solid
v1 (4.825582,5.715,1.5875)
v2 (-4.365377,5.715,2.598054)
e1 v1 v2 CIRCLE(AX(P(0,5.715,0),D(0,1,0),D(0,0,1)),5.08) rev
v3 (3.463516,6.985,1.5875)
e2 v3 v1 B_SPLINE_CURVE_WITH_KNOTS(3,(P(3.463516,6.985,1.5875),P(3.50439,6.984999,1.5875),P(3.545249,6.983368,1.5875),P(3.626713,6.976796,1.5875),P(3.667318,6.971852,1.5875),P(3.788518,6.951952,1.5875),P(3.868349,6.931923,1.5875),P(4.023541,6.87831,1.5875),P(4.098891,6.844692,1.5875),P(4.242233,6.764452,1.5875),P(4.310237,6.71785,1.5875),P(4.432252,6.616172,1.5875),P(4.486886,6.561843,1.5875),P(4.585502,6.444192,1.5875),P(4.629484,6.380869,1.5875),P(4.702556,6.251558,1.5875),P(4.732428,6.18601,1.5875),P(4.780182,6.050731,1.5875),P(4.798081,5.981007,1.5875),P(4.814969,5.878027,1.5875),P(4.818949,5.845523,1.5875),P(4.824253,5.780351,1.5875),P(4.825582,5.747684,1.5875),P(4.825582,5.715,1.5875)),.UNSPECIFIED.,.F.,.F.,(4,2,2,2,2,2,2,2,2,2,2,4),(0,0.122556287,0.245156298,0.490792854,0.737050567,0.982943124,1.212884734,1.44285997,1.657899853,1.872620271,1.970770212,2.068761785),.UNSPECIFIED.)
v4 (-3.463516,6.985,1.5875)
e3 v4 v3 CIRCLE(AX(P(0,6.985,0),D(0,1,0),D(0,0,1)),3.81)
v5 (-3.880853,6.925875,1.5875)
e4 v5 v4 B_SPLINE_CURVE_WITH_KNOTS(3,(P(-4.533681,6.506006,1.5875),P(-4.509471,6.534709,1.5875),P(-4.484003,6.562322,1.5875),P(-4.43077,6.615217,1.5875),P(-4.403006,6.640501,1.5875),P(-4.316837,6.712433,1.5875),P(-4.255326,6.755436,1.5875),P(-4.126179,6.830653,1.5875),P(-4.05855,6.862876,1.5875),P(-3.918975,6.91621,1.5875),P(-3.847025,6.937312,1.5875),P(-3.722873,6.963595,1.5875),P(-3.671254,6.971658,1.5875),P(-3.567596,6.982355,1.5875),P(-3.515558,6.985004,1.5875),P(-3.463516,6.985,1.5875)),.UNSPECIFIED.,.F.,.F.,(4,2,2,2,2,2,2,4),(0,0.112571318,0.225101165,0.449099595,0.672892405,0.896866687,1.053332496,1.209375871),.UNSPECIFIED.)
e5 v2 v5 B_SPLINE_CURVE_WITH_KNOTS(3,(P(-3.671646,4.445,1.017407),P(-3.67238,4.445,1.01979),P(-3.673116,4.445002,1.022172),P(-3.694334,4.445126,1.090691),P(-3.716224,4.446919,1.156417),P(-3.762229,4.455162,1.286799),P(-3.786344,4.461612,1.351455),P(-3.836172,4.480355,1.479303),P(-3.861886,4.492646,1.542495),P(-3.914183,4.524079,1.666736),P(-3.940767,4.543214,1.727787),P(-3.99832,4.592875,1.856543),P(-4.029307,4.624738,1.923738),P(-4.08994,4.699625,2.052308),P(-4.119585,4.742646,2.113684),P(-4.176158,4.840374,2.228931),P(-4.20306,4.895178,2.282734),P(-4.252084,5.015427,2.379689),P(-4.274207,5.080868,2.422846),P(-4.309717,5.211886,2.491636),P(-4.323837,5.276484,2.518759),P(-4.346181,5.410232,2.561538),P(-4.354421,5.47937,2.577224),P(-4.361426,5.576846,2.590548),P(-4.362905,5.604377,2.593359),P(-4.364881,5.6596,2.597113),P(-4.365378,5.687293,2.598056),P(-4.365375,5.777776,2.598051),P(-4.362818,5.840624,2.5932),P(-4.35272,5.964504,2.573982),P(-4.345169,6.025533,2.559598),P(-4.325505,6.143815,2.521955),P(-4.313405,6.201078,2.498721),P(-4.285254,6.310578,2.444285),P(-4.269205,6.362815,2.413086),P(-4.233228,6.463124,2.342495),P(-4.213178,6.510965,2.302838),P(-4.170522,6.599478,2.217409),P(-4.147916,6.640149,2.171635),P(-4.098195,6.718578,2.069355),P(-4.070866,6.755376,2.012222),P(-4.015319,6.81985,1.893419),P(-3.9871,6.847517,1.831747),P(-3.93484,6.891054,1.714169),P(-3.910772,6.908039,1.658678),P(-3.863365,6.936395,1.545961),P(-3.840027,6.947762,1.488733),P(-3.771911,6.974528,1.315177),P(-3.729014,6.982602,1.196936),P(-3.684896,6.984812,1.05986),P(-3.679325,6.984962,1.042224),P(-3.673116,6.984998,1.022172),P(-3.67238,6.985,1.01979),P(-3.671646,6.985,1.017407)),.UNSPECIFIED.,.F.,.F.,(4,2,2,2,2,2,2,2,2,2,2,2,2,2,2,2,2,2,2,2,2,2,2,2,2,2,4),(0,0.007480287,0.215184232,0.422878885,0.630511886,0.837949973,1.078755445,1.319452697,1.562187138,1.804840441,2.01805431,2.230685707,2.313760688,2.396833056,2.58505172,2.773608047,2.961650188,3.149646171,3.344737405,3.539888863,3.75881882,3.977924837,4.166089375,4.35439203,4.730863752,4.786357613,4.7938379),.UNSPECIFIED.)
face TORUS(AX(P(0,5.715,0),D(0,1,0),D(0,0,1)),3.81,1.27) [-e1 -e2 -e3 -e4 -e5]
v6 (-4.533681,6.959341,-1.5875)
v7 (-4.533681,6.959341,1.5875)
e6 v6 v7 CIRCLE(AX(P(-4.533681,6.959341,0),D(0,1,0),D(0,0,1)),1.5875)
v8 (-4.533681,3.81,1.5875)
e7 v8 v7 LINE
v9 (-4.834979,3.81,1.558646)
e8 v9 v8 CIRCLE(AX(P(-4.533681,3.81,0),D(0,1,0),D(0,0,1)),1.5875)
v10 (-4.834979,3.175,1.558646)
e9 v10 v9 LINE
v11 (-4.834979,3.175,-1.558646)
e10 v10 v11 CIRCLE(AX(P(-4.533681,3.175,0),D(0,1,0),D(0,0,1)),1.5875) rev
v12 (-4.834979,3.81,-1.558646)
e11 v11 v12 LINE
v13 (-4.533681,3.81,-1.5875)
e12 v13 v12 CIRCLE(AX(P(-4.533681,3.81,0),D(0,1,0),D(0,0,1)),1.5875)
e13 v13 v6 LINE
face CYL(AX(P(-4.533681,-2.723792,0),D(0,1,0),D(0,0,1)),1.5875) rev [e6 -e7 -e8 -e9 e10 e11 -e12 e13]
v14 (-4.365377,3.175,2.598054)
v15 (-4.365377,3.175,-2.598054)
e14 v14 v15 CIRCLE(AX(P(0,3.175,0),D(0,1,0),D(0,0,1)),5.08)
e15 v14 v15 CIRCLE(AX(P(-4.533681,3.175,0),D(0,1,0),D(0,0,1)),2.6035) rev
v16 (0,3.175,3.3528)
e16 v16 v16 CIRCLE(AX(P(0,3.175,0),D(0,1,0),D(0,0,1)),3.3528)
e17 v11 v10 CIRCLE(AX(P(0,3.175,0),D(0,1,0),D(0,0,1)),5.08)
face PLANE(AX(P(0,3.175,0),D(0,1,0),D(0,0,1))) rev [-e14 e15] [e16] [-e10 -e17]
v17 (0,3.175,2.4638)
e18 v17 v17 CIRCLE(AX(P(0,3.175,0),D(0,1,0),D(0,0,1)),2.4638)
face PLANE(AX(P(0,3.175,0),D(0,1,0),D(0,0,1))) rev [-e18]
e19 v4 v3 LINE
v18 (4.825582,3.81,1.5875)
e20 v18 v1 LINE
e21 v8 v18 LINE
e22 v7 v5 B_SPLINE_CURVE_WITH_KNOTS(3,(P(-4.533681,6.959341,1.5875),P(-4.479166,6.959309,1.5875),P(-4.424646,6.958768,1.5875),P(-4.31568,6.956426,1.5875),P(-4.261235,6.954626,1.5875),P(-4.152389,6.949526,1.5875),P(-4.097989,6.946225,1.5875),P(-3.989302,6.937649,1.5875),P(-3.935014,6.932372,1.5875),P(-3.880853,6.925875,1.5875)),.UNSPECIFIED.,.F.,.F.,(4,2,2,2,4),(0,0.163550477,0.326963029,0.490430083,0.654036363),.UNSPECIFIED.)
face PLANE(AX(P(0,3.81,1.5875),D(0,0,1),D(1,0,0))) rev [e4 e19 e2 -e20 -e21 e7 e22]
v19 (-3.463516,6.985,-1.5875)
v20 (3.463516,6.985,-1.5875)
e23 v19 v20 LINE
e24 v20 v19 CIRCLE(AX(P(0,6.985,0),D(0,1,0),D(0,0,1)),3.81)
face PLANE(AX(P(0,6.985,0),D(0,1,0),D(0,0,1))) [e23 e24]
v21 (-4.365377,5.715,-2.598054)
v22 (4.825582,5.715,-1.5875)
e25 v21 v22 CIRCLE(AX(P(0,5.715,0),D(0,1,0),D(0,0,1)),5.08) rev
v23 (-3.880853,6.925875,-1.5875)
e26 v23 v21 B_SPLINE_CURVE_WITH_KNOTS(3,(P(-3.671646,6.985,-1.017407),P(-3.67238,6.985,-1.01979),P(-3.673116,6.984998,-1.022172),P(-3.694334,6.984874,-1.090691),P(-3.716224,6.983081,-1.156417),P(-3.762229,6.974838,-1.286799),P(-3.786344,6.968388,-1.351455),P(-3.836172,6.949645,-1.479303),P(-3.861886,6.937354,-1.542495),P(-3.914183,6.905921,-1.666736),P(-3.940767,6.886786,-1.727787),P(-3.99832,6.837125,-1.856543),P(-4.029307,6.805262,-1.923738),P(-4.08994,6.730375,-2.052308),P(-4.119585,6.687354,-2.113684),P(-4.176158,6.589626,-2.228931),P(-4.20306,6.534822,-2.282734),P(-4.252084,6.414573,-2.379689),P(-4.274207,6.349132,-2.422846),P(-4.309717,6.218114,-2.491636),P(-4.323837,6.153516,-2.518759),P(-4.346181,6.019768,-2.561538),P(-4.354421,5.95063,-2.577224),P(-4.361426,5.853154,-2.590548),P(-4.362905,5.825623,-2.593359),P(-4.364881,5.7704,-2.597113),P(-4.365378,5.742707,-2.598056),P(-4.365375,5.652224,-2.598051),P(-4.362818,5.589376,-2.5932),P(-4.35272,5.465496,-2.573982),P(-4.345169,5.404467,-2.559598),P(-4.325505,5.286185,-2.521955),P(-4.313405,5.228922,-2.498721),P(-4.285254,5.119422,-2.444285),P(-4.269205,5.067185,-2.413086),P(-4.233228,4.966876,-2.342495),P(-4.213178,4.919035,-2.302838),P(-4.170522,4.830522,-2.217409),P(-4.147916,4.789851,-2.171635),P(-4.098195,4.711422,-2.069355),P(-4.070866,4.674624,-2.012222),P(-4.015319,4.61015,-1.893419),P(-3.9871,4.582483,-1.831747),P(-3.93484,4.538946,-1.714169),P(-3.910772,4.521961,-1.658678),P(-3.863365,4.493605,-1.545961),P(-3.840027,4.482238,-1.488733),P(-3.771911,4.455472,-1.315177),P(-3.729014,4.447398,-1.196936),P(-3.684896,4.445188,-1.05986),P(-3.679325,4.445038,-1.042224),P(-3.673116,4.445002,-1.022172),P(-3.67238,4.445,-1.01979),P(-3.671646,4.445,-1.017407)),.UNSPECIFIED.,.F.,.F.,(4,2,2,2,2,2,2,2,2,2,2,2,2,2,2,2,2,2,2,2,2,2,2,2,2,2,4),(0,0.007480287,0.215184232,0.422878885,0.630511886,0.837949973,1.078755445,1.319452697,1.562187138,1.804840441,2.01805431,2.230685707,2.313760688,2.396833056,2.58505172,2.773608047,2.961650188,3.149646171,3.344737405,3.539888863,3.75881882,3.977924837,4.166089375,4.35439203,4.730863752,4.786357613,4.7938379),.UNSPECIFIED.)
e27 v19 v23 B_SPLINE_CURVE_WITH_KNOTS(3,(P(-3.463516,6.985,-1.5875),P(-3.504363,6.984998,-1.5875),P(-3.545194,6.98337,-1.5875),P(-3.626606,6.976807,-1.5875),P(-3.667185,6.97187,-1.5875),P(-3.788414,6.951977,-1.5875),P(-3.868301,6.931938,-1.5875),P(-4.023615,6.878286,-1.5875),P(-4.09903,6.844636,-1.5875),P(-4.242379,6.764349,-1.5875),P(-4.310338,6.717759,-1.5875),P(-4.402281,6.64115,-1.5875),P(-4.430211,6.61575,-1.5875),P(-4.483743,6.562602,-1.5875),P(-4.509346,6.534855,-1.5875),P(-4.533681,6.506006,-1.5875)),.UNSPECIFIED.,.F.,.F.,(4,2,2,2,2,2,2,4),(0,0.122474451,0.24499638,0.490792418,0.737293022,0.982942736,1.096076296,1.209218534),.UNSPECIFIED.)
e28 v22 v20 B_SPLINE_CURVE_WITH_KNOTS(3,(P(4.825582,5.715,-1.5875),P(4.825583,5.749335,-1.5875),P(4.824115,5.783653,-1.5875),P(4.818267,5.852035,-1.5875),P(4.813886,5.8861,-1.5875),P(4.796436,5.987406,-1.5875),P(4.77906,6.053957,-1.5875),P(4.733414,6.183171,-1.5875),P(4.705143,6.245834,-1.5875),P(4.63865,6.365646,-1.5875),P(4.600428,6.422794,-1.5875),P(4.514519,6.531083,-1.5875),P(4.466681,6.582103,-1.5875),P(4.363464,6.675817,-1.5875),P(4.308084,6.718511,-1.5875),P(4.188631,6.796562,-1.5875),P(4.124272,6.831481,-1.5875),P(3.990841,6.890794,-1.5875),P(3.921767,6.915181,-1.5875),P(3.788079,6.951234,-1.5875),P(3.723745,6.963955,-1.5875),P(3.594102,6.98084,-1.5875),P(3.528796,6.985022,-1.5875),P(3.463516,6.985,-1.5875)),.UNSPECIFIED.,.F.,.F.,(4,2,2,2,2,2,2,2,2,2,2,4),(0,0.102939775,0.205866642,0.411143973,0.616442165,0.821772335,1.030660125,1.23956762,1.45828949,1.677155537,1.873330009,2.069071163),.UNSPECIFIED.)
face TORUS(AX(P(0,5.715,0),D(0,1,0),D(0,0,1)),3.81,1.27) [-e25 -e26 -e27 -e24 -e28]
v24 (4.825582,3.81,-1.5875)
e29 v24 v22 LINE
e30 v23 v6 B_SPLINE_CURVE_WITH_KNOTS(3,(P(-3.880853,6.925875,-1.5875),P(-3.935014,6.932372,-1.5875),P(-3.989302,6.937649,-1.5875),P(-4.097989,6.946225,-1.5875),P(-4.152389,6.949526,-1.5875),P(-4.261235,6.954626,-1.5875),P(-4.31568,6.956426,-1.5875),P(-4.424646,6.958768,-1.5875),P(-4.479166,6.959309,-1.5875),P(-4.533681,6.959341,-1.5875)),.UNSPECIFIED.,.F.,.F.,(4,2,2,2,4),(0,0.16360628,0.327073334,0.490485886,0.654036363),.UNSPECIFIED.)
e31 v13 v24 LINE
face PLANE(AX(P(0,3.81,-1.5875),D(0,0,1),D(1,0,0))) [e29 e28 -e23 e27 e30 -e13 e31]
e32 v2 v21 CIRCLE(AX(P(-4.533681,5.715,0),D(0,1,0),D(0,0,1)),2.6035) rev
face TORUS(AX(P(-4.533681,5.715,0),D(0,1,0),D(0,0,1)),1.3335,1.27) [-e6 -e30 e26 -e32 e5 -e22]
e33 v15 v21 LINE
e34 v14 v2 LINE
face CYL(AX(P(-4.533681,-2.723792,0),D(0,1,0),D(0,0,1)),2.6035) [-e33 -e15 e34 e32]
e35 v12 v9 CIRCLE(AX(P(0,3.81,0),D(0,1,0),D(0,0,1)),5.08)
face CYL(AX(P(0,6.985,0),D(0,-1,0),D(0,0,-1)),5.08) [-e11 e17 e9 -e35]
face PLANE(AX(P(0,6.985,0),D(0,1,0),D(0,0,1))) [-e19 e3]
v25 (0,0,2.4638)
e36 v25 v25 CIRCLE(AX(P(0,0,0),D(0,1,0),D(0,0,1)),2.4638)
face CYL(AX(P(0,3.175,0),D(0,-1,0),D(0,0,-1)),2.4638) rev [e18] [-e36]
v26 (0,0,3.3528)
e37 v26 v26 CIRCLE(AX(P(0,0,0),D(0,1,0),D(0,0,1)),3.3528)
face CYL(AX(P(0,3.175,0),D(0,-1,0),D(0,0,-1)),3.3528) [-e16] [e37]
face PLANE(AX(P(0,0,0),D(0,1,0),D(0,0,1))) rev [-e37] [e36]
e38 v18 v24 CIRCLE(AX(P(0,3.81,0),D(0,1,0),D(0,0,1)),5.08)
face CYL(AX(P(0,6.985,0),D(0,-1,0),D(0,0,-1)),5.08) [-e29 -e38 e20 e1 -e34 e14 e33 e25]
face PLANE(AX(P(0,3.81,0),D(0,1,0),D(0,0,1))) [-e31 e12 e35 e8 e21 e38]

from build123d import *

# Parameters (mm, degrees)
SKETCH1_R           = 3.3528
SKETCH1_R_2         = 2.4638
BOSS_EXTRUDE1_DEPTH = 3.175
SKETCH2_R           = 5.08
BOSS_EXTRUDE2_DEPTH = 3.81
BOSS_EXTRUDE3_START = -3.81
SKETCH3_R           = 5.08
SKETCH3_R_2         = 2.6035
SKETCH3_R_3         = 1.5875
BOSS_EXTRUDE3_DEPTH = 3.81
CUT_EXTRUDE1_START  = -3.175
CUT_EXTRUDE1_DEPTH  = 3.175
FILLET1_R           = 1.27


with BuildPart() as part:
    # Sketch1 → Boss-Extrude1 (new body)
    with BuildSketch(Plane(origin=(0, 0, 0), x_dir=(1, 0, 0), z_dir=(0, 1, 0))):
        with Locations(Location((0, 0, 0), (0, 0, 270))):
            Circle(SKETCH1_R)
        with Locations(Location((0, 0, 0), (0, 0, 270))):
            Circle(SKETCH1_R_2, mode=Mode.SUBTRACT)
    extrude(amount=BOSS_EXTRUDE1_DEPTH)

    # Sketch2 → Boss-Extrude2 (add)
    with BuildSketch(Plane(origin=(0, 3.175, 0), x_dir=(1, 0, 0), z_dir=(0, 1, 0))):
        with Locations(Location((0, 0, 0), (0, 0, 90))):
            Circle(SKETCH2_R)
    extrude(amount=BOSS_EXTRUDE2_DEPTH)

    # Sketch3 → Boss-Extrude3 (add)
    # profile 1 of 3: a face of its own
    with BuildSketch(Plane(origin=(0, 6.985, 0), x_dir=(1, 0, 0), z_dir=(0, 1, 0)).offset(BOSS_EXTRUDE3_START)):
        Circle(SKETCH3_R)
    # profile 2 of 3: a face of its own
    with BuildSketch(Plane(origin=(0, 6.985, 0), x_dir=(1, 0, 0), z_dir=(0, 1, 0)).offset(BOSS_EXTRUDE3_START)):
        with Locations((-4.533681302, 0)):
            Circle(SKETCH3_R_2)
        with Locations((-4.533681302, 0)):
            Circle(SKETCH3_R_3, mode=Mode.SUBTRACT)
    # profile 3 of 3: a face of its own
    with BuildSketch(Plane(origin=(0, 6.985, 0), x_dir=(1, 0, 0), z_dir=(0, 1, 0)).offset(BOSS_EXTRUDE3_START)):
        Circle(SKETCH3_R)
    extrude(amount=BOSS_EXTRUDE3_DEPTH)

    # Sketch4 → Cut-Extrude1 (cut)
    with BuildSketch(Plane(origin=(0, 6.985, 0), x_dir=(1, 0, 0), z_dir=(0, 1, 0)).offset(CUT_EXTRUDE1_START)):
        with BuildLine():
            ThreePointArc((-4.834979234, -1.558645504), (-4.685019521, -1.580269912), (-4.533681302, -1.5875))
            Line((-4.533681302, -1.5875), (4.825582219, -1.5875))
            ThreePointArc((4.825582219, -1.5875), (5.015992308, -0.803878824), (5.08, 0))
            ThreePointArc((5.08, 0), (5.015992308, 0.803878824), (4.825582219, 1.5875))
            Line((4.825582219, 1.5875), (-4.533681302, 1.5875))
            ThreePointArc((-4.533681302, 1.5875), (-4.685019521, 1.580269912), (-4.834979234, 1.558645504))
            ThreePointArc((-4.834979234, 1.558645504), (-5.08, 0), (-4.834979234, -1.558645504))
        make_face()
    extrude(amount=CUT_EXTRUDE1_DEPTH, mode=Mode.SUBTRACT)

    # Fillet1
    # the kernel refuses this fillet: 1.27 mm, written as the material it takes off along each edge
    with BuildSketch(Plane(origin=(-4.533681302, 6.985, 0), x_dir=(0.9598113025197432, 0, -0.2806461536443247), z_dir=(0.2806461536443247, 0, 0.9598113025197432))) as fillet1_piece_1_section:
        with BuildLine():
            CenterArc((2.6035 - FILLET1_R, -FILLET1_R), FILLET1_R, 0, 90)
            Line((2.6035, -FILLET1_R), (2.6035, 0))
            Line((2.6035, 0), (2.6035 - FILLET1_R, 0))
        make_face()
    fillet1_piece_1 = revolve(axis=Axis((-4.533681302, 6.985, 0), (0, 1, 0)), revolution_arc=327.402454095, mode=Mode.PRIVATE)
    fillet1_piece_1 = split(fillet1_piece_1, bisect_by=Plane(origin=(-4.533681302, 6.985, 1.5875), z_dir=(0, 0, -1)), keep=Keep.TOP, mode=Mode.PRIVATE)
    fillet1_piece_1 = split(fillet1_piece_1, bisect_by=Plane(origin=(-4.533681302, 6.985, -1.5875), z_dir=(0, 0, 1)), keep=Keep.TOP, mode=Mode.PRIVATE)
    add(fillet1_piece_1, mode=Mode.SUBTRACT)
    with BuildSketch(Plane(origin=(-4.533681302, 6.985, 0), x_dir=(0.9598113025197432, 0, -0.2806461536443247), z_dir=(0.2806461536443247, 0, 0.9598113025197432))) as fillet1_piece_2_section:
        with BuildLine():
            CenterArc((2.6035 - FILLET1_R, -FILLET1_R), FILLET1_R, 0, 90)
            Line((2.6035, -FILLET1_R), (2.6035, 0))
            Line((2.6035, 0), (2.6035 - FILLET1_R, 0))
        make_face()
    fillet1_piece_2 = revolve(axis=Axis((-4.533681302, 6.985, 0), (0, 1, 0)), revolution_arc=327.402454095, mode=Mode.PRIVATE)
    fillet1_piece_2 = fillet1_piece_2 - Plane(origin=(0, 6.985, 0), x_dir=(0, 0, -1), z_dir=(0, -1, 0)) * Cylinder(5.08, 11, mode=Mode.PRIVATE)
    add(fillet1_piece_2, mode=Mode.SUBTRACT)
    with BuildSketch(Plane(origin=(0, 6.985, 0), x_dir=(-0.9960699199988063, 0, 0.08857039275949603), z_dir=(0.08857039275949603, 0, 0.9960699199988063))) as fillet1_piece_3_section:
        with BuildLine():
            CenterArc((5.08 - FILLET1_R, FILLET1_R), FILLET1_R, 270, 90)
            Line((5.08 - FILLET1_R, 0), (5.08, 0))
            Line((5.08, 0), (5.08, FILLET1_R))
        make_face()
    fillet1_piece_3 = revolve(axis=Axis((0, 6.985, 0), (0, -1, 0)), revolution_arc=202.711774456, mode=Mode.PRIVATE)
    fillet1_piece_3 = fillet1_piece_3 - Plane(origin=(-4.533681302, 6.985, 0), x_dir=(1, 0, 0), z_dir=(0, -1, 0)) * Cylinder(2.6035, 21, mode=Mode.PRIVATE)
    add(fillet1_piece_3, mode=Mode.SUBTRACT)
    with BuildSketch(Plane(origin=(0, 6.985, 0), x_dir=(0.9530300689504536, 0, -0.30287569674091297), z_dir=(-0.30287569674091297, 0, -0.9530300689504536))) as fillet1_piece_4_section:
        with BuildLine():
            CenterArc((5.08 - FILLET1_R, FILLET1_R), FILLET1_R, 270, 90)
            Line((5.08 - FILLET1_R, 0), (5.08, 0))
            Line((5.08, 0), (5.08, FILLET1_R))
        make_face()
    fillet1_piece_4 = revolve(axis=Axis((0, 6.985, 0), (0, -1, 0)), revolution_arc=202.711774456, mode=Mode.PRIVATE)
    fillet1_piece_4 = fillet1_piece_4 - Plane(origin=(-4.533681302, 6.985, 0), x_dir=(1, 0, 0), z_dir=(0, -1, 0)) * Cylinder(2.6035, 21, mode=Mode.PRIVATE)
    add(fillet1_piece_4, mode=Mode.SUBTRACT)
    with BuildSketch(Plane(origin=(0, 6.985, 0), x_dir=(-0.9960699199988063, 0, 0.08857039275949603), z_dir=(0.08857039275949603, 0, 0.9960699199988063))) as fillet1_piece_5a_section:
        with BuildLine():
            CenterArc((5.08 - FILLET1_R, FILLET1_R), FILLET1_R, 270, 90)
            Line((5.08 - FILLET1_R, 0), (5.08, 0))
            Line((5.08, 0), (5.08, FILLET1_R))
        make_face()
    fillet1_piece_5a = revolve(axis=Axis((0, 6.985, 0), (0, -1, 0)), revolution_arc=202.711774456, mode=Mode.PRIVATE)
    fillet1_piece_5a = split(fillet1_piece_5a, bisect_by=Plane(origin=(0, 6.985, -1.5875), z_dir=(0, 0, -1)), keep=Keep.TOP, mode=Mode.PRIVATE)
    fillet1_piece_5a = fillet1_piece_5a & Plane(origin=(-4.533681302, 6.985, 0), x_dir=(1, 0, 0), z_dir=(0, -1, 0)) * Cylinder(2.6035, 21, mode=Mode.PRIVATE)
    with BuildSketch(Plane(origin=(-4.533681302, 6.985, 0), x_dir=(0.9598113025197432, 0, -0.2806461536443247), z_dir=(0.2806461536443247, 0, 0.9598113025197432))) as fillet1_piece_5b_section:
        with BuildLine():
            CenterArc((2.6035 - FILLET1_R, -FILLET1_R), FILLET1_R, 0, 90)
            Line((2.6035, -FILLET1_R), (2.6035, 0))
            Line((2.6035, 0), (2.6035 - FILLET1_R, 0))
        make_face()
    fillet1_piece_5b = revolve(axis=Axis((-4.533681302, 6.985, 0), (0, 1, 0)), revolution_arc=327.402454095, mode=Mode.PRIVATE)
    fillet1_piece_5b = fillet1_piece_5b & Plane(origin=(0, 6.985, 0), x_dir=(0, 0, -1), z_dir=(0, -1, 0)) * Cylinder(5.08, 11, mode=Mode.PRIVATE)
    fillet1_piece_5b = split(fillet1_piece_5b, bisect_by=Plane(origin=(-4.533681302, 6.985, -1.5875), z_dir=(0, 0, -1)), keep=Keep.TOP, mode=Mode.PRIVATE)
    fillet1_piece_5 = fillet1_piece_5a & fillet1_piece_5b
    add(fillet1_piece_5, mode=Mode.SUBTRACT)
    with BuildSketch(Plane(origin=(0, 6.985, 0), x_dir=(0.9530300689504536, 0, -0.30287569674091297), z_dir=(-0.30287569674091297, 0, -0.9530300689504536))) as fillet1_piece_6a_section:
        with BuildLine():
            CenterArc((5.08 - FILLET1_R, FILLET1_R), FILLET1_R, 270, 90)
            Line((5.08 - FILLET1_R, 0), (5.08, 0))
            Line((5.08, 0), (5.08, FILLET1_R))
        make_face()
    fillet1_piece_6a = revolve(axis=Axis((0, 6.985, 0), (0, -1, 0)), revolution_arc=202.711774456, mode=Mode.PRIVATE)
    fillet1_piece_6a = split(fillet1_piece_6a, bisect_by=Plane(origin=(0, 6.985, 1.5875), z_dir=(0, 0, 1)), keep=Keep.TOP, mode=Mode.PRIVATE)
    fillet1_piece_6a = fillet1_piece_6a & Plane(origin=(-4.533681302, 6.985, 0), x_dir=(1, 0, 0), z_dir=(0, -1, 0)) * Cylinder(2.6035, 21, mode=Mode.PRIVATE)
    with BuildSketch(Plane(origin=(-4.533681302, 6.985, 0), x_dir=(0.9598113025197432, 0, -0.2806461536443247), z_dir=(0.2806461536443247, 0, 0.9598113025197432))) as fillet1_piece_6b_section:
        with BuildLine():
            CenterArc((2.6035 - FILLET1_R, -FILLET1_R), FILLET1_R, 0, 90)
            Line((2.6035, -FILLET1_R), (2.6035, 0))
            Line((2.6035, 0), (2.6035 - FILLET1_R, 0))
        make_face()
    fillet1_piece_6b = revolve(axis=Axis((-4.533681302, 6.985, 0), (0, 1, 0)), revolution_arc=327.402454095, mode=Mode.PRIVATE)
    fillet1_piece_6b = fillet1_piece_6b & Plane(origin=(0, 6.985, 0), x_dir=(0, 0, -1), z_dir=(0, -1, 0)) * Cylinder(5.08, 11, mode=Mode.PRIVATE)
    fillet1_piece_6b = split(fillet1_piece_6b, bisect_by=Plane(origin=(-4.533681302, 6.985, 1.5875), z_dir=(0, 0, 1)), keep=Keep.TOP, mode=Mode.PRIVATE)
    fillet1_piece_6 = fillet1_piece_6a & fillet1_piece_6b
    add(fillet1_piece_6, mode=Mode.SUBTRACT)


solid = part.part
